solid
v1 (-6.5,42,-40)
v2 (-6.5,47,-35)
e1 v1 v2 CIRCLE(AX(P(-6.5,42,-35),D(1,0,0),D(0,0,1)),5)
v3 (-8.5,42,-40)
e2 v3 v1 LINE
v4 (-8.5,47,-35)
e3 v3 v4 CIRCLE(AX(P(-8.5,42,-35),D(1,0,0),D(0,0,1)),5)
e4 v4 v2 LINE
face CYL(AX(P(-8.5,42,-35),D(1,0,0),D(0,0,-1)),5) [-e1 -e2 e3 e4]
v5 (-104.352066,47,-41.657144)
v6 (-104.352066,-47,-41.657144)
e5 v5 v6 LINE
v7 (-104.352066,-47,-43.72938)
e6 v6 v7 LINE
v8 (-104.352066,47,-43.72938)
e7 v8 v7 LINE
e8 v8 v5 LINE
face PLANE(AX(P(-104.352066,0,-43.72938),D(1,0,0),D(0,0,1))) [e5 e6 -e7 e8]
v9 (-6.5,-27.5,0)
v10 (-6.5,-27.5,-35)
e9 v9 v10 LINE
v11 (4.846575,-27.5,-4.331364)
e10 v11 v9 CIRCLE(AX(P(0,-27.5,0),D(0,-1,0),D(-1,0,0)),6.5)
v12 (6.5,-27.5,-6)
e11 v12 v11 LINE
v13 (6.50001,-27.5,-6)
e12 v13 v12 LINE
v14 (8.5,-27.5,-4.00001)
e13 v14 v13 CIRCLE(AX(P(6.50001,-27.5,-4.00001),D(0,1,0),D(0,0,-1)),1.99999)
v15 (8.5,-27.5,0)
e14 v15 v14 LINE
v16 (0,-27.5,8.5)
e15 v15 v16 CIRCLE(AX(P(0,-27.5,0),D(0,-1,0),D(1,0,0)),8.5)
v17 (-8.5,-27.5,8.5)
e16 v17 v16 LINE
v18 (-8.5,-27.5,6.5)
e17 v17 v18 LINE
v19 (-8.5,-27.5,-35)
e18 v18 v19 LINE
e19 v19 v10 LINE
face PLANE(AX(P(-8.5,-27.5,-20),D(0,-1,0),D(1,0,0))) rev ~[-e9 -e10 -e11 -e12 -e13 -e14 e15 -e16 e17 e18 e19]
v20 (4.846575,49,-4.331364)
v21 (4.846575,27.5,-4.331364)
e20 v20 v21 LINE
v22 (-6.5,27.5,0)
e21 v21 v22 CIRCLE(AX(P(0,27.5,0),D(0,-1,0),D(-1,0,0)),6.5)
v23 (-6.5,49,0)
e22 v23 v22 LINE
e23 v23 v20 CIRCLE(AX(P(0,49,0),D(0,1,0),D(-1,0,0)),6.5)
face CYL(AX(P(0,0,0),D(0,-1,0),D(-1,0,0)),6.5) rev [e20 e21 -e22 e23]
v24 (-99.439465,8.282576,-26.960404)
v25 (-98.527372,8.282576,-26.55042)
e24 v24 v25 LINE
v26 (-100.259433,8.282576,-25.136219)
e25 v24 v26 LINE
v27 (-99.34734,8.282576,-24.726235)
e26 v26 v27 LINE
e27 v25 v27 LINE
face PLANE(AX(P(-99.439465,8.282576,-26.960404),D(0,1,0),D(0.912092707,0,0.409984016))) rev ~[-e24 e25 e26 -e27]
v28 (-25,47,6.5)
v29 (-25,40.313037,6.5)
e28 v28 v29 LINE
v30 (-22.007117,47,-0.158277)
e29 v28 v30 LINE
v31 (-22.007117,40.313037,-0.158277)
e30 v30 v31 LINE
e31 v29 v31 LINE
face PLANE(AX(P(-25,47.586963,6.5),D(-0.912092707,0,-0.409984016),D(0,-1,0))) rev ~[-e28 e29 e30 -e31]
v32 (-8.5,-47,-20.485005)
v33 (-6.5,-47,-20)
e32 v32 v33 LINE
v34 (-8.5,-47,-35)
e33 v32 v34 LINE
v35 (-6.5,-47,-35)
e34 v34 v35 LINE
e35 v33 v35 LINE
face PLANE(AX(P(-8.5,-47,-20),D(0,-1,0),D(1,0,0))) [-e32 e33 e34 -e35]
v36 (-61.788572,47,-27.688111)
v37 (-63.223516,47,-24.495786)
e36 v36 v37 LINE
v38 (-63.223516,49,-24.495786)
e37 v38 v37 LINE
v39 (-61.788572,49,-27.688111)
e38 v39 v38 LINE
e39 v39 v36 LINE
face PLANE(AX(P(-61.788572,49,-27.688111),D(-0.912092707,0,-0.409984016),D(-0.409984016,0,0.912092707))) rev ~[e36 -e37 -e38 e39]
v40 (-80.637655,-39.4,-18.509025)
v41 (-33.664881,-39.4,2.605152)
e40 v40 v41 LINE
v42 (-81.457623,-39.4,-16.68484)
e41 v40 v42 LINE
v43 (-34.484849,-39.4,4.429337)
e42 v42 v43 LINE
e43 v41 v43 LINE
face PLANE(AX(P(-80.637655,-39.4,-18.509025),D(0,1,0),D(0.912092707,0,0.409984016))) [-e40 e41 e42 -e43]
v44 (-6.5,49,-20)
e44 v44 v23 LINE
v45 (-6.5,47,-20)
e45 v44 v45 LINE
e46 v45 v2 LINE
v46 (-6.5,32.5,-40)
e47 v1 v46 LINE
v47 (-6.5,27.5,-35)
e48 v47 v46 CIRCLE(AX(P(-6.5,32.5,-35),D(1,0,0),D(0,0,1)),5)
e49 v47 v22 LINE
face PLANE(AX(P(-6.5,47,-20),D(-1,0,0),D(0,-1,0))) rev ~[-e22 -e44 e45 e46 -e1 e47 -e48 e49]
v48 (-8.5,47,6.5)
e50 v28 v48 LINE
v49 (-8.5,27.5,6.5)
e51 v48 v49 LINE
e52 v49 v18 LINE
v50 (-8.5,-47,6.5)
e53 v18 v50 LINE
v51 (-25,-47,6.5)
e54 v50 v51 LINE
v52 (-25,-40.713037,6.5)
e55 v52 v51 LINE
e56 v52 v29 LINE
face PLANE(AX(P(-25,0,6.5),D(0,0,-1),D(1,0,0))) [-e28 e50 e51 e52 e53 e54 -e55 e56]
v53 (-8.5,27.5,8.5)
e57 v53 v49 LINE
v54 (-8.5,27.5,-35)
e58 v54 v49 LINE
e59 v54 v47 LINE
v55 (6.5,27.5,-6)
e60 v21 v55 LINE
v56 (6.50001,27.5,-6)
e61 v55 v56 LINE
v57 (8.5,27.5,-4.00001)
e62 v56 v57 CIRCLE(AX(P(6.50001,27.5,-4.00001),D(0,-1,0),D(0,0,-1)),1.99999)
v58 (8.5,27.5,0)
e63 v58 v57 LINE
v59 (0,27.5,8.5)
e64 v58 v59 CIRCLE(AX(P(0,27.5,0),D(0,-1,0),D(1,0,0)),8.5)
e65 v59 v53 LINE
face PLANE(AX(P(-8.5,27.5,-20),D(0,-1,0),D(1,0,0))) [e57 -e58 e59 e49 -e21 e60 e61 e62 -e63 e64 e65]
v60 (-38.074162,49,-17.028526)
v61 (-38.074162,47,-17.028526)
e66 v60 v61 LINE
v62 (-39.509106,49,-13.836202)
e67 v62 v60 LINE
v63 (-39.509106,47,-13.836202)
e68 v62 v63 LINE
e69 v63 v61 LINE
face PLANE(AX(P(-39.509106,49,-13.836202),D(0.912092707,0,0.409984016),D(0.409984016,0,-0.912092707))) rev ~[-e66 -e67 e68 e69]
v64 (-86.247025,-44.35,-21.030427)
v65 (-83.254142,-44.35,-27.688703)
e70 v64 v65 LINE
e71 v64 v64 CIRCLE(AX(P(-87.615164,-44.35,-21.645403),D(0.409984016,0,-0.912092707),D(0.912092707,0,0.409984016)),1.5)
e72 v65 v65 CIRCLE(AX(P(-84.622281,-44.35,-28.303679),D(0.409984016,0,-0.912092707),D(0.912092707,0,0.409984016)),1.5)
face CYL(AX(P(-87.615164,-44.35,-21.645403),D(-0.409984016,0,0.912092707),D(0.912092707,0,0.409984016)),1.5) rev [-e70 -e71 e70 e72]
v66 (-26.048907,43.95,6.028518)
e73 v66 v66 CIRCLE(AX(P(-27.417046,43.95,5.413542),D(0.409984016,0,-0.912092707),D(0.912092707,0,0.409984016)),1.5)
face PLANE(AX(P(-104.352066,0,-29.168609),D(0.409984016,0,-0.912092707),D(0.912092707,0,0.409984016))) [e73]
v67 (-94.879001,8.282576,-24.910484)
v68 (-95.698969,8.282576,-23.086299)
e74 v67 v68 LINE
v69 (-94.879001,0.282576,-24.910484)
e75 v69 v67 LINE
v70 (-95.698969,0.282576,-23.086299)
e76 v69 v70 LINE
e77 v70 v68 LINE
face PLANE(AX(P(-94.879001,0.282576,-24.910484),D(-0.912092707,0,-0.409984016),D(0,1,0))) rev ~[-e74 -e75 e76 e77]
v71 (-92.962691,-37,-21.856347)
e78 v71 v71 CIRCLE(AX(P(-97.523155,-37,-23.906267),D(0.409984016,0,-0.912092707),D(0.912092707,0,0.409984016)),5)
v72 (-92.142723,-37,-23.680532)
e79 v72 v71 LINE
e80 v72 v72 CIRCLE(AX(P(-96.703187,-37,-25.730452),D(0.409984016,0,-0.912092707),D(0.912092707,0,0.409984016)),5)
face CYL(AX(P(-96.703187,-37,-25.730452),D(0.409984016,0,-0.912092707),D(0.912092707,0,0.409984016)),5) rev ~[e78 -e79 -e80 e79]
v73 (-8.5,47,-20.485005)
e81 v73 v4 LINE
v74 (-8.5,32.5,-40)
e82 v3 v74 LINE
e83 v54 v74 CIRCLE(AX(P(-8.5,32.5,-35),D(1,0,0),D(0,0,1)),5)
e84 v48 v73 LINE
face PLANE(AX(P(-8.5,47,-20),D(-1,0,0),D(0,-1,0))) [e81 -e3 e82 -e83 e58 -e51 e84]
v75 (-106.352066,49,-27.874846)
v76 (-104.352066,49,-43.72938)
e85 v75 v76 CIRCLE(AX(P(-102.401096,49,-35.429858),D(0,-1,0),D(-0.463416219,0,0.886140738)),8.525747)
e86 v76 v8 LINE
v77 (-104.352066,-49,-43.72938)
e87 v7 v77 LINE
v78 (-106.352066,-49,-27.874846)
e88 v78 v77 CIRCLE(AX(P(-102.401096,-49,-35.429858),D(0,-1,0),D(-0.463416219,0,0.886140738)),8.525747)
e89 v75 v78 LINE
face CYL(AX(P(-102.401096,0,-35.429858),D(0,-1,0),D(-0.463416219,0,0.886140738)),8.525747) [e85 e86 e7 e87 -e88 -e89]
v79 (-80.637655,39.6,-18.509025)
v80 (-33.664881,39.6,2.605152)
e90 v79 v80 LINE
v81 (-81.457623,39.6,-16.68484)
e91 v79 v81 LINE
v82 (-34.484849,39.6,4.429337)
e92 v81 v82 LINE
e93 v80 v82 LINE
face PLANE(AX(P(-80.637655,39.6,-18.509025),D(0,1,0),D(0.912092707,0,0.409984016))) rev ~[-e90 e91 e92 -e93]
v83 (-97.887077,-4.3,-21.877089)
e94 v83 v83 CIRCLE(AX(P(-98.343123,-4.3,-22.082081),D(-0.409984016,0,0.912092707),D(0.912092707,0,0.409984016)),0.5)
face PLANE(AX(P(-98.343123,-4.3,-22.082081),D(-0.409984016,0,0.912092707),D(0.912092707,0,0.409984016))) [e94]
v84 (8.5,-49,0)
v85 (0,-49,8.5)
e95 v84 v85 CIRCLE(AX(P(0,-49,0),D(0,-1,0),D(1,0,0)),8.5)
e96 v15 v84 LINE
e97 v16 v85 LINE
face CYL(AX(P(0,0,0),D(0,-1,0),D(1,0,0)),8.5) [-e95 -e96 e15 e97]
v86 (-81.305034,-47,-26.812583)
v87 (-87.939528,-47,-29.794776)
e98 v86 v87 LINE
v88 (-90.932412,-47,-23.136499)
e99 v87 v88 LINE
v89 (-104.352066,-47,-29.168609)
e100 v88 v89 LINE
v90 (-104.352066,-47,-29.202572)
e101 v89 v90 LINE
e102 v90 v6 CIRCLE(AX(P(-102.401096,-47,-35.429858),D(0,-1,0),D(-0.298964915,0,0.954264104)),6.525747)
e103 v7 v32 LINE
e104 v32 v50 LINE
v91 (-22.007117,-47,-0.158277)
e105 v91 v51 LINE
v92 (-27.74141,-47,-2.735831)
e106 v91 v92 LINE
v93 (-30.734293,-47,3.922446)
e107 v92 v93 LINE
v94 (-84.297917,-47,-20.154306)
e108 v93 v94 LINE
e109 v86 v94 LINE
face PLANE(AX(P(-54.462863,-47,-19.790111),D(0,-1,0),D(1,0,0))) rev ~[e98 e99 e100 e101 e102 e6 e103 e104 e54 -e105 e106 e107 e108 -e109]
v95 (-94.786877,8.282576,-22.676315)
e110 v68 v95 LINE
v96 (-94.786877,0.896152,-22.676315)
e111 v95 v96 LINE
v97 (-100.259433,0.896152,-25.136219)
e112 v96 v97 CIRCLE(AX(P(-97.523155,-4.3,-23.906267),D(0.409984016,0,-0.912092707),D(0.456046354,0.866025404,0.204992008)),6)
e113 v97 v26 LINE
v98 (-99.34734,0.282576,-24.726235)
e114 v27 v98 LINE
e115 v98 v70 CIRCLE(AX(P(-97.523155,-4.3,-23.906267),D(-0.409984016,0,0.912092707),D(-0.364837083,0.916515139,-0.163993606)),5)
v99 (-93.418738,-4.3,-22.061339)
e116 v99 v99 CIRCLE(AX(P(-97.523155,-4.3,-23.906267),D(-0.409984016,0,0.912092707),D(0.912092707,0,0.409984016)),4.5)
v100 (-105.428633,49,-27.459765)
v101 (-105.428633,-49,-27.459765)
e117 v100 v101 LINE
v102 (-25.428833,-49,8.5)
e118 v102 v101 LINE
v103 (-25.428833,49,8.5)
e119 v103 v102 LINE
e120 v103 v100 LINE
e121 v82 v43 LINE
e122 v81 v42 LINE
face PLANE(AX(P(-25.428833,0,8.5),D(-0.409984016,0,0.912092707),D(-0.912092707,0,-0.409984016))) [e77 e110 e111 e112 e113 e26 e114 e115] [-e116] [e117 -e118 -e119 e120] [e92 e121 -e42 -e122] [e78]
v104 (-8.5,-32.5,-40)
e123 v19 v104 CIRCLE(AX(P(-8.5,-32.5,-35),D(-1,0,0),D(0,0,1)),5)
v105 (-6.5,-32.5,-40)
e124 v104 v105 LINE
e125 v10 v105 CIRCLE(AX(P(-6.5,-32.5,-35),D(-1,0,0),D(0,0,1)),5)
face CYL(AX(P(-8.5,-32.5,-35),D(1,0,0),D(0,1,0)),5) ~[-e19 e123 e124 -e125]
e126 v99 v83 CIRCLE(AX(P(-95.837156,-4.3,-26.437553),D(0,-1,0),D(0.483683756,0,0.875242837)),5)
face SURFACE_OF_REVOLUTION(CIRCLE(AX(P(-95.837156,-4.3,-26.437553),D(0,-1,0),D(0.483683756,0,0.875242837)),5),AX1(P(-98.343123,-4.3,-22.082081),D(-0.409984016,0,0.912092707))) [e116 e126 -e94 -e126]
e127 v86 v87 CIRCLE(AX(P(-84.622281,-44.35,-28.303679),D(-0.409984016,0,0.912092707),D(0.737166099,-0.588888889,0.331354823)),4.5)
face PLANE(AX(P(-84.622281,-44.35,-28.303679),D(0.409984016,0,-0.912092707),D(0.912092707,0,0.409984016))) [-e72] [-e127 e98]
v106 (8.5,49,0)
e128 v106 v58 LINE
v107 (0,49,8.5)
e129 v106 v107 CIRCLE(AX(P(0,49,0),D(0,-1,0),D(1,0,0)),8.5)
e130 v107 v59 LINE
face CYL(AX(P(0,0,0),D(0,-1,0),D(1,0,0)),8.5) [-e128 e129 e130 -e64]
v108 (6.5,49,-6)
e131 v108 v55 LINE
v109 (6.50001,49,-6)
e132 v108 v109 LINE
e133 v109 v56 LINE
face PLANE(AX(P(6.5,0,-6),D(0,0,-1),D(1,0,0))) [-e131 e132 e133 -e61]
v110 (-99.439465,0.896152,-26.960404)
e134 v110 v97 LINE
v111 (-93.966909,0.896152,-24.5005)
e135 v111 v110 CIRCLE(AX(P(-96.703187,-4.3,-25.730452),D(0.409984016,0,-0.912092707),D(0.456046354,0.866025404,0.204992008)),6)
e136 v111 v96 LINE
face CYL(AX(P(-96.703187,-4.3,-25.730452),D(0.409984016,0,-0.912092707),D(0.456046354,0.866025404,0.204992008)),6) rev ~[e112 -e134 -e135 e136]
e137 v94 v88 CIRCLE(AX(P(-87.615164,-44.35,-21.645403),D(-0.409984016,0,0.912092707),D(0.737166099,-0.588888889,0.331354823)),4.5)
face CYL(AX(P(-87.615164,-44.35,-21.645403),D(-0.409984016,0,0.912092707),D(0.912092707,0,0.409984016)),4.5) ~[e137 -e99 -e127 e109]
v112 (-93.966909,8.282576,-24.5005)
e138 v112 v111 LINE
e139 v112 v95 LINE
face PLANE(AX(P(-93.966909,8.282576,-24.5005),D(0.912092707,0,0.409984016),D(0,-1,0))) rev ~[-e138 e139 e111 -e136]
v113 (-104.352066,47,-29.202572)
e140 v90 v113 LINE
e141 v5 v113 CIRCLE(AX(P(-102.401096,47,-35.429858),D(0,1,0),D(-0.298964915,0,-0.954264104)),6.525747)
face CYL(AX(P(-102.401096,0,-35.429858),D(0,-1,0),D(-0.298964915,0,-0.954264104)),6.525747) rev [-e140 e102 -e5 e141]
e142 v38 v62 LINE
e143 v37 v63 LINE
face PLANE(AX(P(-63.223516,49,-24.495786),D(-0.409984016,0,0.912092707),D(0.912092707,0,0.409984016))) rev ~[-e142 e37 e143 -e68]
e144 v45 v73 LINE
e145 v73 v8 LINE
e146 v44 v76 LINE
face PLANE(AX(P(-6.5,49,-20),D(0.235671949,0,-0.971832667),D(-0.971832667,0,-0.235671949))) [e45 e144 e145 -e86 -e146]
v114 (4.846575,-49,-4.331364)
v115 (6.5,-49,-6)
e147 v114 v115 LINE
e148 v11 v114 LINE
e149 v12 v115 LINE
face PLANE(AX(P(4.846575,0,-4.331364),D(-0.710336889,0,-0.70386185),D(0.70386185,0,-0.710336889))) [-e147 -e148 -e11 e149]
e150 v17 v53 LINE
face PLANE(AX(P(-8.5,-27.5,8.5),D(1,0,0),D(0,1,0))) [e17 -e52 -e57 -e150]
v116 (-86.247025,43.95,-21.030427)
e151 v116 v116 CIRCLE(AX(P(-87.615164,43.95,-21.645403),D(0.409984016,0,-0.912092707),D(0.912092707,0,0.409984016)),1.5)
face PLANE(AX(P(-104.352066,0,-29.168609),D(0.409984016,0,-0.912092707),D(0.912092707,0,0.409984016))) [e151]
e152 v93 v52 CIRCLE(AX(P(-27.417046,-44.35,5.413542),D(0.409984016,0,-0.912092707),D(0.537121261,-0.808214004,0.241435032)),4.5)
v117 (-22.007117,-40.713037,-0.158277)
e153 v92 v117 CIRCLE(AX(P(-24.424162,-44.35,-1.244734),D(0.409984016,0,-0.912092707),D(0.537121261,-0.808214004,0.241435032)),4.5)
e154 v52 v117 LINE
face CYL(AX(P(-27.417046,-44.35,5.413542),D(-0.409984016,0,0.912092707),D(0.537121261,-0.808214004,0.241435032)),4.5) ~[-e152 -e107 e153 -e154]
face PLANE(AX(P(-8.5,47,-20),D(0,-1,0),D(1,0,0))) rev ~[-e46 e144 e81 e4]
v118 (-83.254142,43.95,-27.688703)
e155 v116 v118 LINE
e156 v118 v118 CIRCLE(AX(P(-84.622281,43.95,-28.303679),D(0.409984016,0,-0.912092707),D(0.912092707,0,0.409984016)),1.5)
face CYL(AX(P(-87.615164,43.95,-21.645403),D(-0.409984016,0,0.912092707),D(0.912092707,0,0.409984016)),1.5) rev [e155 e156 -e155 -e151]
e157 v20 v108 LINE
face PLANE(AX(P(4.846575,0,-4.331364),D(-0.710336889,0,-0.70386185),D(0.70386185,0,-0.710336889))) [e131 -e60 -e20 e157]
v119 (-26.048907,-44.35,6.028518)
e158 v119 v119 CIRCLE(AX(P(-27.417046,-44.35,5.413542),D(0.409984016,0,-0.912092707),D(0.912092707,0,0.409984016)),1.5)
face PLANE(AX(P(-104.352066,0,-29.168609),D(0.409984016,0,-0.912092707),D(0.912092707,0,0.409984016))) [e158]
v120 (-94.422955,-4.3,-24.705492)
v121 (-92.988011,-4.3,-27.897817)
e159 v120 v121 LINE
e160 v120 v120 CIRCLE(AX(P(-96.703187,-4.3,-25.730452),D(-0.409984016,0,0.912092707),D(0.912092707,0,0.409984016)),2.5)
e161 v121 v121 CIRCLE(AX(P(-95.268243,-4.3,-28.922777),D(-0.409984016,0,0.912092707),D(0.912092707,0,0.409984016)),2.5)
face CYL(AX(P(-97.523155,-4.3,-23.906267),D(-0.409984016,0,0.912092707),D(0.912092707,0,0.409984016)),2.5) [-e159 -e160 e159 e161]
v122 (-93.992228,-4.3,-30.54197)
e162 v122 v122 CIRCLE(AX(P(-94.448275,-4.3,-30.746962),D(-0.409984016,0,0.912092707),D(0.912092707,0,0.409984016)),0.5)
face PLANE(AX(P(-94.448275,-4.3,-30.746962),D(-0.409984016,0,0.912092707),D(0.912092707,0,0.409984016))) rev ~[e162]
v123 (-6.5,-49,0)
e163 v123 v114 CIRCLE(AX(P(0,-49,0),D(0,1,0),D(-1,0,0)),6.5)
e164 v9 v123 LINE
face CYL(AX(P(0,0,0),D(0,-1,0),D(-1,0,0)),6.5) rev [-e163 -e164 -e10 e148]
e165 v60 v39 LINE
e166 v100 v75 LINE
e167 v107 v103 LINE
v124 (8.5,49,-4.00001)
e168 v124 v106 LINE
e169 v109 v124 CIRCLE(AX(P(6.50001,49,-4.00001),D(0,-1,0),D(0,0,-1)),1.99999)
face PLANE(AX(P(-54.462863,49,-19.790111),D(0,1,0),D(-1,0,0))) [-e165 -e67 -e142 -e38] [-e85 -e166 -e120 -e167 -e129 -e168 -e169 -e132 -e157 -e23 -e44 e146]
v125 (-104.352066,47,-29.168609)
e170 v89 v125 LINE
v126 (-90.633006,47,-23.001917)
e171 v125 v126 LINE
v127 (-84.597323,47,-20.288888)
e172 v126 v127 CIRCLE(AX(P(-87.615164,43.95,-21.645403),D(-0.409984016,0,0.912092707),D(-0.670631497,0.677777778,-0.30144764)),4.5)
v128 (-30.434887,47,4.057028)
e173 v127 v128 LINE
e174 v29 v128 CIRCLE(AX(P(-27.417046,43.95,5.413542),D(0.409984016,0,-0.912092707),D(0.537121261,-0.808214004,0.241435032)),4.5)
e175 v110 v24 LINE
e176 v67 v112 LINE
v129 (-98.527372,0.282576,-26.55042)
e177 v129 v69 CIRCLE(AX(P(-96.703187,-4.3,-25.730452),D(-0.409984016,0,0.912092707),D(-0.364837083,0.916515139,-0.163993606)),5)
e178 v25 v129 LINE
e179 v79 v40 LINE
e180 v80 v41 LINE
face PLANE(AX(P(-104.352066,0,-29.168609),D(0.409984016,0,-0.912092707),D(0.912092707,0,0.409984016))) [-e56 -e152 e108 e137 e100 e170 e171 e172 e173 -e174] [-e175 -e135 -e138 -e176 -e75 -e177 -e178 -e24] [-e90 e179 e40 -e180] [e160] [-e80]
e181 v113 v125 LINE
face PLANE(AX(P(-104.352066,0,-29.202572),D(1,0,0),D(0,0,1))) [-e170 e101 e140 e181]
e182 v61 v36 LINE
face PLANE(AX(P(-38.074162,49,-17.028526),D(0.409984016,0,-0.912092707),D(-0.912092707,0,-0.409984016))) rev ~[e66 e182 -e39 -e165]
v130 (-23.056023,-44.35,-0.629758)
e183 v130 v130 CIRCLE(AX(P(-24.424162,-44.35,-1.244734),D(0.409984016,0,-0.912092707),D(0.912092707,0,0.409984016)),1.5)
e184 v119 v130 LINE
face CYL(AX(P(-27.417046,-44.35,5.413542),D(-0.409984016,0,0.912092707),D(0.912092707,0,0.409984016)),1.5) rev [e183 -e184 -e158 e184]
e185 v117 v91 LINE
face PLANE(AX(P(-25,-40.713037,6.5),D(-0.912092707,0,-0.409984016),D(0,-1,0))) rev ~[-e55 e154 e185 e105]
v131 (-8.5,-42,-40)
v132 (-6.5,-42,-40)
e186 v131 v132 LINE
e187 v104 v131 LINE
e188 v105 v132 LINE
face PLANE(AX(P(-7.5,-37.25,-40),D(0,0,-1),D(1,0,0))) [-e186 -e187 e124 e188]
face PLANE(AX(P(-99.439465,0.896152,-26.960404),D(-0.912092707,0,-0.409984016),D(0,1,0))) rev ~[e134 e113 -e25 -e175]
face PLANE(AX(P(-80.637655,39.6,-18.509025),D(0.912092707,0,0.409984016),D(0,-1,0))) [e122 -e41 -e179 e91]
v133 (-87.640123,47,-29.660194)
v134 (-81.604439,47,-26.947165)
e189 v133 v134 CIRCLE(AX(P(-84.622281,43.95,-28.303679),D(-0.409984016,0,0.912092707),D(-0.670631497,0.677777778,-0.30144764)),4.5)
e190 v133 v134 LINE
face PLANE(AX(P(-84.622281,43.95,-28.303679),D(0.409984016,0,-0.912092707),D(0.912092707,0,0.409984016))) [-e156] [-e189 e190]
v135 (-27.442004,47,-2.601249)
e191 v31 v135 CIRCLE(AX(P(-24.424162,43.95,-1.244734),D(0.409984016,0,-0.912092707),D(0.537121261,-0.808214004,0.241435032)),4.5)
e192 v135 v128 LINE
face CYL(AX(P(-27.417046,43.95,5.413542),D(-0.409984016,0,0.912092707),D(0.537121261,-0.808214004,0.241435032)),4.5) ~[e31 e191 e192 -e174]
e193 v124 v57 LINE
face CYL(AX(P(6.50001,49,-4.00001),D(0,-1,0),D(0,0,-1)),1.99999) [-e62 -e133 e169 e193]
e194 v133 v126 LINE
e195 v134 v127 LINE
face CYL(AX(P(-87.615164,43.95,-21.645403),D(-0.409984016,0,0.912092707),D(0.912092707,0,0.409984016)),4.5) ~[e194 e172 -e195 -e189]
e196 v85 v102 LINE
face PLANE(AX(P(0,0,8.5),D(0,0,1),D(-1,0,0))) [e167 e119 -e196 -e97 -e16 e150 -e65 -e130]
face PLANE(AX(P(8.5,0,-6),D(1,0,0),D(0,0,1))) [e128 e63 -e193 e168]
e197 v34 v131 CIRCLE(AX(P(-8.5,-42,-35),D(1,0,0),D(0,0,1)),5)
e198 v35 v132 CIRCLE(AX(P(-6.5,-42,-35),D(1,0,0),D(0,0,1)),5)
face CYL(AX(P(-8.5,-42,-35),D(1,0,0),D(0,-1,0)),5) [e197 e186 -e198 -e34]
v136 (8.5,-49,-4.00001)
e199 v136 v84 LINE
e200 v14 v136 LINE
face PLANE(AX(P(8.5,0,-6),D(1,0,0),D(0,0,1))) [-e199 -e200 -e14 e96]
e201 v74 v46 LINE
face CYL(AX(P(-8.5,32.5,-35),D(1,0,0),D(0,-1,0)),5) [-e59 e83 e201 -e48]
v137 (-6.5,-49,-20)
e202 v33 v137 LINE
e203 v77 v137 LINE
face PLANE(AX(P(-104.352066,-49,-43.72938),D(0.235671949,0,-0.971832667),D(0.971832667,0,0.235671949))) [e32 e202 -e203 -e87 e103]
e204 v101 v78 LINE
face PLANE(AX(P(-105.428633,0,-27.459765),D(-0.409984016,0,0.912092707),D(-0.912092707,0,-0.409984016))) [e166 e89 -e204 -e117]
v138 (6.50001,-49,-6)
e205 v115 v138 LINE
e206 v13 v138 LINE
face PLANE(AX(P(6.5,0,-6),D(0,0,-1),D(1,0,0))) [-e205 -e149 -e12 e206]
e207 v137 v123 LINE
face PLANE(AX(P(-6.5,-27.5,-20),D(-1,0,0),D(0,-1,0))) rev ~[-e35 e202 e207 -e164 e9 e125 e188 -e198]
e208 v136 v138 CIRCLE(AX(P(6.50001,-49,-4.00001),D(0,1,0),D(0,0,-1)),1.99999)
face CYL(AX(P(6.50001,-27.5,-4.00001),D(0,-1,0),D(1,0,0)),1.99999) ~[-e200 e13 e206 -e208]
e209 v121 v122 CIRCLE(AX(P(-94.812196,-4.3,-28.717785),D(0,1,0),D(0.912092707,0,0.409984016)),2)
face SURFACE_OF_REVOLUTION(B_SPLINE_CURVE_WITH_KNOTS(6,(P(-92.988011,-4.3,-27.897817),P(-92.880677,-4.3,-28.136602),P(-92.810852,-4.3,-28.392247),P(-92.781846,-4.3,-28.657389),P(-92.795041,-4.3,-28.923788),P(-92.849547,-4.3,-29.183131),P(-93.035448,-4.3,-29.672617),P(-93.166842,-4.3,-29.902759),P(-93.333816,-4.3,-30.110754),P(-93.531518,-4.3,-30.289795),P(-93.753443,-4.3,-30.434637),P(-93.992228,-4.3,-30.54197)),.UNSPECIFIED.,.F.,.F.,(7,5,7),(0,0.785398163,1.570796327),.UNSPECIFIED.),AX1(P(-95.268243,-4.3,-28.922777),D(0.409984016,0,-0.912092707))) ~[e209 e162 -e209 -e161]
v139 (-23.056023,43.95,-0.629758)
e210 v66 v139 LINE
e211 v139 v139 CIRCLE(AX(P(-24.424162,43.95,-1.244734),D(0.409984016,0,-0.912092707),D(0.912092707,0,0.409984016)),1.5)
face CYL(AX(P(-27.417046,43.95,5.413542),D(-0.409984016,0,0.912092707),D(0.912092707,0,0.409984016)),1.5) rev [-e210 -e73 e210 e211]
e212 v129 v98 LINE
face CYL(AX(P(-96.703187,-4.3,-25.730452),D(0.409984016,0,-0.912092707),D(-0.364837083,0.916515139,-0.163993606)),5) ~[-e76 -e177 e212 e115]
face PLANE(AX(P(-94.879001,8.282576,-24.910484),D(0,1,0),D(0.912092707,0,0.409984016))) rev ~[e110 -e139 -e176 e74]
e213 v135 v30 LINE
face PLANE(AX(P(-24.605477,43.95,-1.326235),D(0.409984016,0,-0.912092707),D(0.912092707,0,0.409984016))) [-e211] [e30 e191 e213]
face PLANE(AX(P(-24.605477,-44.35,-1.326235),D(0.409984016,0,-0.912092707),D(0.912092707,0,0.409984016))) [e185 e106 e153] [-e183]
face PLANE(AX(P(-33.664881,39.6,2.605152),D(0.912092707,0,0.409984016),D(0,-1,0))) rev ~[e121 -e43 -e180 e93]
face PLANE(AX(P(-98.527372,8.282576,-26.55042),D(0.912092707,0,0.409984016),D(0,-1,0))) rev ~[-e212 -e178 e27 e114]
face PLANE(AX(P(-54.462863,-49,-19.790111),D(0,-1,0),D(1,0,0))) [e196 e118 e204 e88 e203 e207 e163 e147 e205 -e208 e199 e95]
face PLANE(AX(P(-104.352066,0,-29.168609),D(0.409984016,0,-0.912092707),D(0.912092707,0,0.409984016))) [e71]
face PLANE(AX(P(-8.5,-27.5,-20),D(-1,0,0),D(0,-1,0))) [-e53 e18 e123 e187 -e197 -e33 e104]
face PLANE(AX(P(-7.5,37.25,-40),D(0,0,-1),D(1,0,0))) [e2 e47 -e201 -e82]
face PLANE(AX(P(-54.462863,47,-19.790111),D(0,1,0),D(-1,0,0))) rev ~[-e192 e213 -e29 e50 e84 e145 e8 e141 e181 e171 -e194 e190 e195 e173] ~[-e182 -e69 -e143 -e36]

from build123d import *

# Parameters (mm, degrees)
F1_DEPTH  = 49
F2_W      = 51.5
F2_H      = 79
F3_DEPTH  = 2
F2_R      = 1.5
F2_R_2    = 4.5
F4_DEPTH  = 7.3
F6_DEPTH  = 2
F8_DEPTH  = 2
F2_R_3    = 5
F9_DEPTH  = 2
F11_DEPTH = 2
F12_W     = 8.5
F12_H     = 55
F13_DEPTH = 40
F14_R     = 1.99999
F15_W     = 2
F15_H     = 19.5
F16_DEPTH = 20
F17_W     = 2
F17_H     = 19.5
F18_DEPTH = 20
F19_R     = 5
F20_DEPTH = 2
F21_R     = 2.5
F22_DEPTH = 7.5
F21_R_2   = 4.5
F23_DEPTH = 2
F25_R     = 2


# Not quite as in the source:
# - a fillet or chamfer that OpenCascade refuses, or shapes differently, is made with other operations: its cross-section is extruded or revolved along the edge and cut away or added
# - a fillet or chamfer is up to 0.001 mm smaller than in the source, because OpenCascade refuses the exact size
# - a feature names something its author has since deleted; it is built from what else it names


with BuildPart() as f1:
    # F0 (on Front) → F1 (new body, symmetric)
    with BuildSketch(Plane.XZ):
        with BuildLine():
            Line((-25, 6.5), (-8.5, 6.5))
            Line((-8.5, 6.5), (-8.5, 0))
            Line((-8.5, 0), (-8.5, -20))
            Line((-8.5, -20), (-6.5, -20))
            Line((-6.5, -20), (-6.5, 0))
            ThreePointArc((-6.5, 0), (2.3181097502, 6.072591472), (4.8465745188, -4.3313641539))
            Line((4.8465745188, -4.3313641539), (6.5, -6))
            Line((6.5, -6), (8.5, -6))
            Line((8.5, -6), (8.5, 0))
            ThreePointArc((8.5, 0), (6.0104076401, 6.0104076401), (0, 8.5))
            Line((0, 8.5), (-25.4288327804, 8.5))
            Line((-25.4288327804, 8.5), (-105.428633061, -27.4597649849))
            Line((-105.428633061, -27.4597649849), (-106.3520655314, -27.8748462039))
            ThreePointArc((-106.3520655314, -27.8748462039), (-110.8598066956, -36.4968976222), (-104.3520655314, -43.7293803221))
            Line((-104.3520655314, -43.7293803221), (-104.3520655314, -42.85))
            Line((-104.3520655314, -42.85), (-104.3520655314, -41.6571435378))
            ThreePointArc((-104.3520655314, -41.6571435378), (-108.9268429391, -35.4298576938), (-104.3520655314, -29.2025718498))
            Line((-104.3520655314, -29.2025718498), (-104.3520655314, -29.1686093911))
            Line((-104.3520655314, -29.1686093911), (-25, 6.5))
        make_face()
    extrude(amount=F1_DEPTH, both=True)

    # F2 (on face) → F3 (cut)
    with BuildSketch(Plane(origin=(-6.6328046362, 0, 14.75602097), x_dir=(0.9120927073, 0, 0.409984016), z_dir=(0.409984016, 0, -0.9120927073))):
        with Locations((-55.3874215775, -0.1)):
            Rectangle(F2_W, F2_H)
    extrude(amount=-F3_DEPTH, mode=Mode.SUBTRACT)

    # F2 (on face) → F4 (join)
    with BuildSketch(Plane(origin=(-6.6328046362, 0, 14.75602097), x_dir=(0.9120927073, 0, 0.409984016), z_dir=(0.409984016, 0, -0.9120927073))):
        with BuildLine():
            Line((-20.1374215775, 40.7130369812), (-20.1374215775, 47.9869630188))
            ThreePointArc((-20.1374215775, 47.9869630188), (-27.2874215775, 44.35), (-20.1374215775, 40.7130369812))
        make_face()
        with Locations((-22.7874215775, 44.35)):
            Circle(F2_R, mode=Mode.SUBTRACT)
        with BuildLine():
            Line((-20.1374215775, -47.5869630188), (-20.1374215775, -40.3130369812))
            ThreePointArc((-20.1374215775, -40.3130369812), (-27.2874215775, -43.95), (-20.1374215775, -47.5869630188))
        make_face()
        with Locations((-22.7874215775, -43.95)):
            Circle(F2_R, mode=Mode.SUBTRACT)
        with Locations((-88.7874215775, -43.95)):
            Circle(F2_R_2)
        with Locations((-88.7874215775, -43.95)):
            Circle(F2_R, mode=Mode.SUBTRACT)
        with Locations((-88.7874215775, 44.35)):
            Circle(F2_R_2)
        with Locations((-88.7874215775, 44.35)):
            Circle(F2_R, mode=Mode.SUBTRACT)
    extrude(amount=F4_DEPTH)

    # F5 (on face) → F6 (join)
    with BuildSketch(Plane.XZ.offset(49)):
        with BuildLine():
            Line((-104.3520655314, -43.7293803221), (-6.5, -20))
            Line((-6.5, -20), (-8.5, -20))
            Line((-8.5, -20), (-8.5, 6.5))
            Line((-8.5, 6.5), (-25, 6.5))
            Line((-25, 6.5), (-104.3520655314, -29.1686093911))
            Line((-104.3520655314, -29.1686093911), (-104.3520655314, -29.2025718498))
            ThreePointArc((-104.3520655314, -29.2025718498), (-108.9268429391, -35.4298576938), (-104.3520655314, -41.6571435378))
            Line((-104.3520655314, -41.6571435378), (-104.3520655314, -43.7293803221))
        make_face()
    extrude(amount=-F6_DEPTH)

    # F7 (on face) → F8 (join)
    with BuildSketch(Plane(origin=(0, 49, 0), x_dir=(-1, 0, 0), z_dir=(0, 1, 0))):
        with BuildLine():
            Line((8.5, -20), (6.5, -20))
            Line((6.5, -20), (104.3520655314, -43.7293803221))
            Line((104.3520655314, -43.7293803221), (104.3520655314, -41.6571435378))
            ThreePointArc((104.3520655314, -41.6571435378), (108.9268429391, -35.4298576938), (104.3520655314, -29.2025718498))
            Line((104.3520655314, -29.2025718498), (104.3520655314, -29.1686093911))
            Line((104.3520655314, -29.1686093911), (25, 6.5))
            Line((25, 6.5), (8.5, 6.5))
            Line((8.5, 6.5), (8.5, -20))
        make_face()
    extrude(amount=-F8_DEPTH)

    # F2 (on face) → F9 (cut)
    with BuildSketch(Plane(origin=(-6.6328046362, 0, 14.75602097), x_dir=(0.9120927073, 0, 0.409984016), z_dir=(0.409984016, 0, -0.9120927073))):
        with Locations((-98.7513456427, 37)):
            Circle(F2_R_3)
    extrude(amount=-F9_DEPTH, mode=Mode.SUBTRACT)

    # F10 (on face) → F11 (cut)
    with BuildSketch(Plane(origin=(0, 49, 0), x_dir=(-1, 0, 0), z_dir=(0, 1, 0))):
        Polygon((63.2235160953, -24.4957862935), (39.5091057066, -13.8362018777), (38.0741616506, -17.0285263531), (61.7885720393, -27.6881107689), align=None)
    extrude(amount=-F11_DEPTH, mode=Mode.SUBTRACT)

    # F12 (on face) → F13 (cut)
    with BuildSketch(Plane.XY.offset(8.5)):
        with Locations((4.25, 0)):
            Rectangle(F12_W, F12_H)
        with Locations((-4.25, 0)):
            Rectangle(F12_W, F12_H)
    extrude(amount=-F13_DEPTH, mode=Mode.SUBTRACT)

    # F14 (radius 2 in the source; OpenCascade refuses exactly that, so slightly less here)
    f14_edges = [f1.edges().sort_by_distance(p)[0] for p in [
        (8.5, 38.25, -6),
        (8.5, -38.25, -6),
    ]]
    fillet(f14_edges, radius=F14_R)

    # F15 (on face) → F16 (join)
    with BuildSketch(Plane(origin=(0, 0, -20), x_dir=(1, 0, 0), z_dir=(0, 0, -1))):
        with Locations((-7.5, 37.25)):
            Rectangle(F15_W, F15_H)
    extrude(amount=F16_DEPTH)

    # F17 (on face) → F18 (join)
    with BuildSketch(Plane(origin=(0, 0, -20), x_dir=(1, 0, 0), z_dir=(0, 0, -1))):
        with Locations((-7.5, -37.25)):
            Rectangle(F17_W, F17_H)
    extrude(amount=F18_DEPTH)

    # F19
    f19_edges = [f1.edges().sort_by_distance(p)[0] for p in [
        (-7.5, 47, -40),
        (-7.5, 27.5, -40),
        (-7.5, -27.5, -40),
        (-7.5, -47, -40),
    ]]
    fillet(f19_edges, radius=F19_R)

    # F2 (on face) → F20 (cut)
    with BuildSketch(Plane(origin=(-6.6328046362, 0, 14.75602097), x_dir=(0.9120927073, 0, 0.409984016), z_dir=(0.409984016, 0, -0.9120927073))):
        with BuildLine():
            ThreePointArc((-100.7513456427, -0.282575695), (-98.7513456427, 9.3), (-96.7513456427, -0.282575695))
            Line((-96.7513456427, -0.282575695), (-96.7513456427, -8.282575695))
            Line((-96.7513456427, -8.282575695), (-95.7513456427, -8.282575695))
            Line((-95.7513456427, -8.282575695), (-95.7513456427, -0.8961524227))
            ThreePointArc((-95.7513456427, -0.8961524227), (-98.7513456427, 10.3), (-101.7513456427, -0.8961524227))
            Line((-101.7513456427, -0.8961524227), (-101.7513456427, -8.282575695))
            Line((-101.7513456427, -8.282575695), (-100.7513456427, -8.282575695))
            Line((-100.7513456427, -8.282575695), (-100.7513456427, -0.282575695))
        make_face()
    extrude(amount=-F20_DEPTH, mode=Mode.SUBTRACT)

    # F21 (on face) → F22 (join)
    with BuildSketch(Plane(origin=(-7.4527726682, 0, 16.5802063845), x_dir=(0.9120927073, 0, 0.409984016), z_dir=(-0.409984016, 0, 0.9120927073))):
        with Locations((-98.7513456427, -4.3)):
            Circle(F21_R)
    extrude(amount=-F22_DEPTH)

    # F21 (on face) → F23 (join)
    with BuildSketch(Plane(origin=(-7.4527726682, 0, 16.5802063845), x_dir=(0.9120927073, 0, 0.409984016), z_dir=(-0.409984016, 0, 0.9120927073))):
        with Locations((-98.7513456427, -4.3)):
            Circle(F21_R_2)
        with Locations((-98.7513456427, -4.3)):
            Circle(F21_R, mode=Mode.SUBTRACT)
        with Locations((-98.7513456427, -4.3)):
            Circle(F21_R)
    extrude(amount=F23_DEPTH)

    # F24: fillet of radius 5 on 1 edges, made by hand

    # F24_s1 → F24_t2 (revolve, cut)
    with BuildSketch(Plane.XZ.offset(4.3)):
        with BuildLine():
            ThreePointArc((-93.4187376781, -22.0613388145), (-95.6311594228, -21.4417982804), (-97.8870765391, -21.877089464))
            Line((-97.8870765391, -21.877089464), (-94.2387057101, -20.2371534))
            Line((-94.2387057101, -20.2371534), (-93.4187376781, -22.0613388145))
        make_face()
    revolve(axis=Axis((-98.3431228928, -4.3, -22.082081472), (-0.409984016, 0, 0.9120927073)), mode=Mode.SUBTRACT)

    # F25
    f25_edges = [f1.edges().sort_by_distance(p)[0] for p in [
        (-96.728507, -4.3, -31.771922),
    ]]
    fillet(f25_edges, radius=F25_R)


solid = f1.part
